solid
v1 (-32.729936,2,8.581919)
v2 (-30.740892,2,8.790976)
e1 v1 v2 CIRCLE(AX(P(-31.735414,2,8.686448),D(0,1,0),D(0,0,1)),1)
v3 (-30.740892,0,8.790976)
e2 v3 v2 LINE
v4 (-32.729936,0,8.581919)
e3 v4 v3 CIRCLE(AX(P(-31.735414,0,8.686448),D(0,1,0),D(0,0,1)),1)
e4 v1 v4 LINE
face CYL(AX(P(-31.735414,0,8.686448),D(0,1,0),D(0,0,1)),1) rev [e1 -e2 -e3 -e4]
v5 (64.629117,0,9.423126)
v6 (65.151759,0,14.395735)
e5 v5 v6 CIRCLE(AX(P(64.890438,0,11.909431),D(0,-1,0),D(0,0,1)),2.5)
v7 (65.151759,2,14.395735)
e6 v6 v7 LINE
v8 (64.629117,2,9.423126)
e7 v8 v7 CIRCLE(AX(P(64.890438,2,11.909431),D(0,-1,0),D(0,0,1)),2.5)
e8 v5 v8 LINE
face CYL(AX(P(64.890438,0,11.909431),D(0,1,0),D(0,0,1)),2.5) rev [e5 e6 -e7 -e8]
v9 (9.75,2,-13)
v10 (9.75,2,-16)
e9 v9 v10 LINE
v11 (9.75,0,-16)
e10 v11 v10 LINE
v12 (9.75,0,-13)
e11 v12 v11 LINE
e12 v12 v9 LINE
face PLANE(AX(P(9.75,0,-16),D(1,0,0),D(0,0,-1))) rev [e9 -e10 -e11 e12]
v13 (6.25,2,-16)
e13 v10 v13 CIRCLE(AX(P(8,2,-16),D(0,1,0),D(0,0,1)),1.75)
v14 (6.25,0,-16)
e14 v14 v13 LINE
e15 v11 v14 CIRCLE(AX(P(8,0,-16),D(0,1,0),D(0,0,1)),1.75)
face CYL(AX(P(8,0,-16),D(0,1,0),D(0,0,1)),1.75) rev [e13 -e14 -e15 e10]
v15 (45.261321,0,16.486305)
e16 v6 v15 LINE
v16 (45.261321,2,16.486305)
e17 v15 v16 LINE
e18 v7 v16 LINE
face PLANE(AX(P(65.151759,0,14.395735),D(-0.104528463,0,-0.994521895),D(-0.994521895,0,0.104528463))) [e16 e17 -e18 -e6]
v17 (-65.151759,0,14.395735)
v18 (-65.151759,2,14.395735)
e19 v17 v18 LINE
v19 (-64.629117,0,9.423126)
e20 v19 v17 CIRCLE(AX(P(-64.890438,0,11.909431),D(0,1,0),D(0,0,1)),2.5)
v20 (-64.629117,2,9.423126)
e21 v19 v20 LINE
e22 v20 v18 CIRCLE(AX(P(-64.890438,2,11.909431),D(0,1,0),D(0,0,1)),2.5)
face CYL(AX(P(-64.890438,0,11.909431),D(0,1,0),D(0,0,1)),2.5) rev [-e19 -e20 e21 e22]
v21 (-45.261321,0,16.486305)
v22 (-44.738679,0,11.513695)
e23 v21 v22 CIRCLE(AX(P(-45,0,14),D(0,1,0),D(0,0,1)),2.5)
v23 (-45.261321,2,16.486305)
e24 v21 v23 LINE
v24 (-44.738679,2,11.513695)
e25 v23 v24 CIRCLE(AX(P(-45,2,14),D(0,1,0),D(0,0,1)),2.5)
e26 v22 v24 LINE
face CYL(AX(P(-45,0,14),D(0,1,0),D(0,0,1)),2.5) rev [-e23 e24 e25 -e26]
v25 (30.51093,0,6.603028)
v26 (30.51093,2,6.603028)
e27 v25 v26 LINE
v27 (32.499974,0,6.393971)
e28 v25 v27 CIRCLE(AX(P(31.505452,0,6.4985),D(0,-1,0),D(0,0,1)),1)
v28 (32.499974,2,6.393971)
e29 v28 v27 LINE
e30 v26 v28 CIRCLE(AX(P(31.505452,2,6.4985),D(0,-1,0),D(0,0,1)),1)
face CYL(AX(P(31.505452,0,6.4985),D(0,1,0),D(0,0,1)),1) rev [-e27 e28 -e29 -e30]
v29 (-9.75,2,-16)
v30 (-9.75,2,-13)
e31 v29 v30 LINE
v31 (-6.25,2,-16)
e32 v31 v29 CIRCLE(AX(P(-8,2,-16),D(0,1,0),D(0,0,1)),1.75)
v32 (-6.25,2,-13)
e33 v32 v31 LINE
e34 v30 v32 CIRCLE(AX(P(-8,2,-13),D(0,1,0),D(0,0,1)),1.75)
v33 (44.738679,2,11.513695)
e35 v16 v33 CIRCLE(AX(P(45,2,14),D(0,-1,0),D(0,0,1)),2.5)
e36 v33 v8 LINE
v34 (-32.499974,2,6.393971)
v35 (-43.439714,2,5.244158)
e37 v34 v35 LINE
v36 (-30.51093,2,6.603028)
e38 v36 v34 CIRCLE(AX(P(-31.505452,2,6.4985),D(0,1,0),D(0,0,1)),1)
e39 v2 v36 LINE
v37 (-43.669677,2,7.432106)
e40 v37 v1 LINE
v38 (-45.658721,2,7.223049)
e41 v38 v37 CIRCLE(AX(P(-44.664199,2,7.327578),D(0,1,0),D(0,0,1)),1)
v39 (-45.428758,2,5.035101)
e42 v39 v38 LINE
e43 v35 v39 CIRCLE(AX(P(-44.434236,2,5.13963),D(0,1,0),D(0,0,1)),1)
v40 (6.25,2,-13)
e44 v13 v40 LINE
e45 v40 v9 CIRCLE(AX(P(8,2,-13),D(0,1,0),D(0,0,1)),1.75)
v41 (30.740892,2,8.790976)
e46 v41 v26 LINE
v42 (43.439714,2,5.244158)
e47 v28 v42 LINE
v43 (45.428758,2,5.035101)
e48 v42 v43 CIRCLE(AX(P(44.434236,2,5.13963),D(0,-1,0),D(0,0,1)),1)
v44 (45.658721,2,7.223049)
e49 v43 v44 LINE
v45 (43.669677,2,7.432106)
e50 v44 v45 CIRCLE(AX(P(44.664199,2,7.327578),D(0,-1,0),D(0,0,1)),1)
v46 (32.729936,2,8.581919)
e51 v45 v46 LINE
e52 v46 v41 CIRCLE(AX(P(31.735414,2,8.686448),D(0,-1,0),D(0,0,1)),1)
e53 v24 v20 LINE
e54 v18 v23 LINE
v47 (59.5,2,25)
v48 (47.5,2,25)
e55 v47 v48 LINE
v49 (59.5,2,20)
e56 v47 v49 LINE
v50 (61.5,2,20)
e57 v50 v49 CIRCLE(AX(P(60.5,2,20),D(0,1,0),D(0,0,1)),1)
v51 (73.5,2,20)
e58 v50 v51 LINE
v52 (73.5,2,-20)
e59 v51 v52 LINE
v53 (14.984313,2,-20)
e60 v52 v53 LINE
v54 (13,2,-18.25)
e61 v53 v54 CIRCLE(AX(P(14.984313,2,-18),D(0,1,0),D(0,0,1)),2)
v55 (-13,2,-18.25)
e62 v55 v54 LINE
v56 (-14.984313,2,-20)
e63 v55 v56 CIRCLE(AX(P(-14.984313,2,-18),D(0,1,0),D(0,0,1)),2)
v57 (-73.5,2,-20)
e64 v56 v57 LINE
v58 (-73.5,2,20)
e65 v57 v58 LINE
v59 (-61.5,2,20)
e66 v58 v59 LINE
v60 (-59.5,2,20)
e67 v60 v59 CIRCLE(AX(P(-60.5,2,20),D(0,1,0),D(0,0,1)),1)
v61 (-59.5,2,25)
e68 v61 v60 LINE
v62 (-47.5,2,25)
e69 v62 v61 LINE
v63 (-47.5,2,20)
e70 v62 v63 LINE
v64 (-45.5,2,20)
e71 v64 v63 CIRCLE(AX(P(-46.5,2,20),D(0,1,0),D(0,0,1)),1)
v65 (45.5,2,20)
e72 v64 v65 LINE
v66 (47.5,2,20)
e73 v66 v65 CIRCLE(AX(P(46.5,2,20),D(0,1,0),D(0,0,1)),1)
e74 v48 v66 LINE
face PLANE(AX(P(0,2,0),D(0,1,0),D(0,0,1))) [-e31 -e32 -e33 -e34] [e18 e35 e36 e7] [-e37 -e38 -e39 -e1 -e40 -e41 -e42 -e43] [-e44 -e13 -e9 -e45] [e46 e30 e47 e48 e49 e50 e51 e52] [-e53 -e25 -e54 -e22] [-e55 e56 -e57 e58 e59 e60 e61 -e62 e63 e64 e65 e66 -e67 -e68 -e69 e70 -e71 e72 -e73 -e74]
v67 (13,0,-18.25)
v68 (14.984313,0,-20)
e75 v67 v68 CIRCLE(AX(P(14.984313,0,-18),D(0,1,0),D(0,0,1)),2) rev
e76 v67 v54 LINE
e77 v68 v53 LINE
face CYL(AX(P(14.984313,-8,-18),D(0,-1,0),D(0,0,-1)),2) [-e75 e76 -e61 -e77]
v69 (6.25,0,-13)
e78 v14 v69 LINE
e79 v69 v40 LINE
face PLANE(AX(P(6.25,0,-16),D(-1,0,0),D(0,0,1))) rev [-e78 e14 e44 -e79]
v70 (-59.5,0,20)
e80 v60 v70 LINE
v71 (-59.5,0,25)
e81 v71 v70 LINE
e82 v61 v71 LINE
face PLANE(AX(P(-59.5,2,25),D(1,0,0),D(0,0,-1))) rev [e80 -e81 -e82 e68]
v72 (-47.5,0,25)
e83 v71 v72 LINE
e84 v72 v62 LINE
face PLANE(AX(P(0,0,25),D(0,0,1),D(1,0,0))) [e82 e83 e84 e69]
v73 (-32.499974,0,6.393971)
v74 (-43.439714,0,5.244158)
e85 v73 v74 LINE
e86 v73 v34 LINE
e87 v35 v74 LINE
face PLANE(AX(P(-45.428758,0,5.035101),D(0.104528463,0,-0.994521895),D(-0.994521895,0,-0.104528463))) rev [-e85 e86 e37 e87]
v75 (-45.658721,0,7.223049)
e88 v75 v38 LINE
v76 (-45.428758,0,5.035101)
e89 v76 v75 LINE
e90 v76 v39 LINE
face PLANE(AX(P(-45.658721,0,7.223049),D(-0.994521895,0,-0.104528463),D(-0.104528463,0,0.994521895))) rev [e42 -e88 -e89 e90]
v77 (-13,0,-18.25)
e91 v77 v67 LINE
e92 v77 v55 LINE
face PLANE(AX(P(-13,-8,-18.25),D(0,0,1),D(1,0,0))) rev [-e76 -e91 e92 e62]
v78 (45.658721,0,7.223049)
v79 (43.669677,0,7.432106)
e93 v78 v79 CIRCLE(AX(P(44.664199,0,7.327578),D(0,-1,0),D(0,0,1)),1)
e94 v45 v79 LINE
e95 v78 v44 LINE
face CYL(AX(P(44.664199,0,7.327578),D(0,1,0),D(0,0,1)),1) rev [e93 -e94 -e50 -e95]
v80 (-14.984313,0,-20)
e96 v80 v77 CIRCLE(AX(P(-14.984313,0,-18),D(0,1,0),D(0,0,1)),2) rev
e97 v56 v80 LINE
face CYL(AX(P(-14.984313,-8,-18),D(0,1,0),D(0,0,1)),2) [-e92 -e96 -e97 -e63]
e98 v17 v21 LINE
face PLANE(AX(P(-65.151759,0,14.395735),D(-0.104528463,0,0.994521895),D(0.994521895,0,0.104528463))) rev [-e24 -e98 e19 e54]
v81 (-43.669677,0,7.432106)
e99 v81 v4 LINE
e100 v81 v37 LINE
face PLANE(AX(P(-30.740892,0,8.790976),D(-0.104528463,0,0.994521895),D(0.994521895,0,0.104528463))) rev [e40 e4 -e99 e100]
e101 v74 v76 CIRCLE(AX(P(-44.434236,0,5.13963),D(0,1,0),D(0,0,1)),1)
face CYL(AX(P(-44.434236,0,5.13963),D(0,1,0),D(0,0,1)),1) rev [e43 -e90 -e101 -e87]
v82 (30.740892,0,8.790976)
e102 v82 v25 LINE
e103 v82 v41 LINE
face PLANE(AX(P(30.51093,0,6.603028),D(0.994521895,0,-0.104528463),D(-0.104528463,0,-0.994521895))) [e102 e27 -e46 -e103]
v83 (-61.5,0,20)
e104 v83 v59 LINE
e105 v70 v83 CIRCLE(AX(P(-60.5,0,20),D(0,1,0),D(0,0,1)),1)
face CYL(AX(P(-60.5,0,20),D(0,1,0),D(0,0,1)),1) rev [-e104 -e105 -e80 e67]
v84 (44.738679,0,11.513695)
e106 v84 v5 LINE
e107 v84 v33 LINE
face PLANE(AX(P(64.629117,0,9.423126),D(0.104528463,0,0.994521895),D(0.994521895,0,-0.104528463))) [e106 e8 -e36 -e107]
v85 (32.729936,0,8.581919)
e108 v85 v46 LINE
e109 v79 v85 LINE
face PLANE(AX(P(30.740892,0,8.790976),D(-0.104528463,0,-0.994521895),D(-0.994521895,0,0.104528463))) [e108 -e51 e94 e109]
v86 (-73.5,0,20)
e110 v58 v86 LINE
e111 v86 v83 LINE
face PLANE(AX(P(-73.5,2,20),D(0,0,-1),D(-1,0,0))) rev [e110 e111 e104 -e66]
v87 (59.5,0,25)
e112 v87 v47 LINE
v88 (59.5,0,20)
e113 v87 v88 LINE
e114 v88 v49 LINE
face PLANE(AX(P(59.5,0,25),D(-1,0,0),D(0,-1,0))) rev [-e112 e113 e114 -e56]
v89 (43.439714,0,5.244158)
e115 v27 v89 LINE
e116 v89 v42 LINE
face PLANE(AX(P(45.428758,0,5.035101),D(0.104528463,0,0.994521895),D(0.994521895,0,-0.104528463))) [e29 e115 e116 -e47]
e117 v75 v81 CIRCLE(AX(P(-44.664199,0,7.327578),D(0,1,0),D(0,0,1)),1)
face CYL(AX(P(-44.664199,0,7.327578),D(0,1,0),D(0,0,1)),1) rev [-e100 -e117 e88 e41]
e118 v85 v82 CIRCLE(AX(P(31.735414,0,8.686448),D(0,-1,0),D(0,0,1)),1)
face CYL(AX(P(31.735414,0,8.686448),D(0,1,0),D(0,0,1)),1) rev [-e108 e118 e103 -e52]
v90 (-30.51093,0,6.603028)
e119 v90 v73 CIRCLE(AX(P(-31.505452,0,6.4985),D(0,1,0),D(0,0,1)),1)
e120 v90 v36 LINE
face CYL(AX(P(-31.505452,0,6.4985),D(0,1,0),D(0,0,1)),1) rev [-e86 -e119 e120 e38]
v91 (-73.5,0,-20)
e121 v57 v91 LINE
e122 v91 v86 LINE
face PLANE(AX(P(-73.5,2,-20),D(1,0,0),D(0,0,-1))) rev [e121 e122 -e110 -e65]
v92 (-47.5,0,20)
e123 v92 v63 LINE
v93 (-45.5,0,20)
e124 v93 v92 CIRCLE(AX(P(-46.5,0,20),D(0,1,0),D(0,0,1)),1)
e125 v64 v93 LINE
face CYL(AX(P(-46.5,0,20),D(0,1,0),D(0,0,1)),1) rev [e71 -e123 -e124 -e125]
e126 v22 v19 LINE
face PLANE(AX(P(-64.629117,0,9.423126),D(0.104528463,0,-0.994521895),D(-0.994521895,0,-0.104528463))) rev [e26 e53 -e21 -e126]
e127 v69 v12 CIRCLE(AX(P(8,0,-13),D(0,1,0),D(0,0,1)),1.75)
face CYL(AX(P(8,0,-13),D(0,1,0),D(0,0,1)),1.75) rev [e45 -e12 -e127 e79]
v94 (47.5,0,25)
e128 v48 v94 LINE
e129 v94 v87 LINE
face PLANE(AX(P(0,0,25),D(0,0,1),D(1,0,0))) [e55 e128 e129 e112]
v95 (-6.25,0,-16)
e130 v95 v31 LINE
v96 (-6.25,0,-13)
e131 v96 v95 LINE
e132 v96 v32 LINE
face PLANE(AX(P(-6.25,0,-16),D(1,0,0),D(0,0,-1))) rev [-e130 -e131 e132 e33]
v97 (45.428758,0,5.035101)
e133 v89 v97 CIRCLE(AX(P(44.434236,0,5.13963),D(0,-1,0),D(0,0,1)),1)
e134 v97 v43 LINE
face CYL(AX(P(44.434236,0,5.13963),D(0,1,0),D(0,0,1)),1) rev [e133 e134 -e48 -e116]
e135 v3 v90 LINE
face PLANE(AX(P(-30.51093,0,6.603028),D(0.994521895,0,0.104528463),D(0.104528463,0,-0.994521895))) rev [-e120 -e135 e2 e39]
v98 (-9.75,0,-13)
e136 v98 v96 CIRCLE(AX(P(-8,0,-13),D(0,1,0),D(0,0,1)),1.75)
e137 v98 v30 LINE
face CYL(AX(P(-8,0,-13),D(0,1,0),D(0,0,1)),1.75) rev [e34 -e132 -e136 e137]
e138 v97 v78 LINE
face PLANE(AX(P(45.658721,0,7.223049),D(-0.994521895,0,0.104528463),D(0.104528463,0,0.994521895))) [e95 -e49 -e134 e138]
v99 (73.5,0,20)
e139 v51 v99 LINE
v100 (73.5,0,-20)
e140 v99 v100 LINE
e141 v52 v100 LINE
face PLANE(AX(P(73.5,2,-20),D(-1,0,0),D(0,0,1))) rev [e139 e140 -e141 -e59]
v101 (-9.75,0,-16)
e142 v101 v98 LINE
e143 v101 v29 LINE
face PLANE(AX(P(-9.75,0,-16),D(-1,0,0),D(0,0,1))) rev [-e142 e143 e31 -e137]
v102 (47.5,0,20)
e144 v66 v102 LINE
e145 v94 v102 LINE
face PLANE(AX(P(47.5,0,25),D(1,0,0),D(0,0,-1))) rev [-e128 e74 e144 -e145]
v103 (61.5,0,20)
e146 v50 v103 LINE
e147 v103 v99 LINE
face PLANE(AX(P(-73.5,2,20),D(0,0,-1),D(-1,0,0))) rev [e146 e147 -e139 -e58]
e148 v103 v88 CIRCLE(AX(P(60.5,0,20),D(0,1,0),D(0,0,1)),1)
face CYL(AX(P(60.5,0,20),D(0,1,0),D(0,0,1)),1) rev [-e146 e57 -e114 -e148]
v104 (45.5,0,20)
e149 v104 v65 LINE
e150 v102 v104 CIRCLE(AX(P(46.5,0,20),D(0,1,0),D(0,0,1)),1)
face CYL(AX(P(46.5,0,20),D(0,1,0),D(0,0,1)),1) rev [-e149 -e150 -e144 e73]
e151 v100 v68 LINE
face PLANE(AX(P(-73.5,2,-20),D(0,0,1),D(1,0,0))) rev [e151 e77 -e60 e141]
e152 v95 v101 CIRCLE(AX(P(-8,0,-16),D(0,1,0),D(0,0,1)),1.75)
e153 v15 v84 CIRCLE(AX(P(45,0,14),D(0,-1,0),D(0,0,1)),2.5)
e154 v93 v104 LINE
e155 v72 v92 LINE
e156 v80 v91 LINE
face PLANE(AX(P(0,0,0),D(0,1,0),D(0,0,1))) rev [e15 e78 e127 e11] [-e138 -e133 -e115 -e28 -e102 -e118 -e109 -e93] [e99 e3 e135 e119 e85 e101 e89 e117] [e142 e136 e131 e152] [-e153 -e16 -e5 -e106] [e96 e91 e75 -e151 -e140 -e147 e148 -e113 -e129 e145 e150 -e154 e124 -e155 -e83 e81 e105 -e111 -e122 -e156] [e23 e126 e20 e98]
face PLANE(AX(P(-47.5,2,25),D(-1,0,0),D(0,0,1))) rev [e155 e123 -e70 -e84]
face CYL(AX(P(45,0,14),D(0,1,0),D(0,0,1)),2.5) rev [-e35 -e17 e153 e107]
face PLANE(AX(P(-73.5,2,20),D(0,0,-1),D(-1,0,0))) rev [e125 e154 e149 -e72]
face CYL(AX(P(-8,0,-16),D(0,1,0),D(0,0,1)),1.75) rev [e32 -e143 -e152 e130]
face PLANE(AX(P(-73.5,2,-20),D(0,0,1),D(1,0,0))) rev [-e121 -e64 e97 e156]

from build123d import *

# Parameters (mm, degrees)
SKETCH_1_W          = 147
SKETCH_1_H          = 40
EXTRUDE_1_DEPTH     = 2
CUT_EXTRUDE_1_DEPTH = 77.198753271
SKETCH_3_R          = 1
CUT_EXTRUDE_2_DEPTH = 77.198753271
SKETCH_5_W          = 12
SKETCH_5_H          = 2
EXTRUDE_2_DEPTH     = 5
SKETCH_7_R          = 1
CUT_EXTRUDE_3_DEPTH = 78.661122835
CUT_EXTRUDE_5_DEPTH = 78.661122835
SKETCH_11_W         = 26
SKETCH_11_H         = 3.5
CUT_EXTRUDE_6_DEPTH = 10
FILLET_1_R          = 2
CUT_EXTRUDE_7_DEPTH = 78.661122835


with BuildPart() as part:
    # 草图1 → 凸台-拉伸1 (new body)
    with BuildSketch(Plane(origin=(0, 0, 0), x_dir=(1, 0, 0), z_dir=(0, 1, 0))):
        Rectangle(SKETCH_1_W, SKETCH_1_H)
    extrude(amount=EXTRUDE_1_DEPTH)

    # 草图2 → 切除-拉伸1 (cut, through all)
    with BuildSketch(Plane(origin=(0, 2, 0), x_dir=(1, 0, 0), z_dir=(0, 1, 0))):
        Polygon((-45.658720859, -7.223049229), (-45.42875824, -5.035101059), (-30.51092981, -6.603028008), (-30.740892429, -8.790976178), align=None)
    cut_extrude_1 = extrude(amount=-CUT_EXTRUDE_1_DEPTH, mode=Mode.SUBTRACT)

    # 草图3 → 切除-拉伸2 (cut, through all)
    with BuildSketch(Plane(origin=(0, 2, 0), x_dir=(1, 0, 0), z_dir=(0, 1, 0))):
        with Locations((-44.434236345, -5.139629522)):
            Circle(SKETCH_3_R)
        with Locations((-44.664198964, -7.327577692)):
            Circle(SKETCH_3_R)
        with Locations((-31.505451705, -6.498499545)):
            Circle(SKETCH_3_R)
        with Locations((-31.735414324, -8.686447714)):
            Circle(SKETCH_3_R)
    cut_extrude_2 = extrude(amount=-CUT_EXTRUDE_2_DEPTH, mode=Mode.SUBTRACT)

    # 镜向1: 切除-拉伸1, 切除-拉伸2 across plane
    add(cut_extrude_1.mirror(Plane(origin=(0, 0, 0), x_dir=(0, 0, 1), z_dir=(1, 0, 0))), mode=Mode.SUBTRACT)
    add(cut_extrude_2.mirror(Plane(origin=(0, 0, 0), x_dir=(0, 0, 1), z_dir=(1, 0, 0))), mode=Mode.SUBTRACT)

    # 草图5 → 凸台-拉伸2 (add)
    with BuildSketch(Plane.XY.offset(20)):
        with Locations((53.5, 1)):
            Rectangle(SKETCH_5_W, SKETCH_5_H)
        with Locations((-53.5, 1)):
            Rectangle(SKETCH_5_W, SKETCH_5_H)
    extrude(amount=EXTRUDE_2_DEPTH)

    # 草图7 → 切除-拉伸3 (cut, through all)
    with BuildSketch(Plane(origin=(0, 2, 0), x_dir=(1, 0, 0), z_dir=(0, 1, 0))):
        with Locations((60.5, -20)):
            Circle(SKETCH_7_R)
        with Locations((46.5, -20)):
            Circle(SKETCH_7_R)
        with Locations((-46.5, -20)):
            Circle(SKETCH_7_R)
        with Locations((-60.5, -20)):
            Circle(SKETCH_7_R)
    extrude(amount=-CUT_EXTRUDE_3_DEPTH, mode=Mode.SUBTRACT)

    # 草图10 → 切除-拉伸5 (cut, through all)
    with BuildSketch(Plane(origin=(0, 2, 0), x_dir=(1, 0, 0), z_dir=(0, 1, 0))):
        with BuildLine():
            Line((-64.629116749, -9.423125996), (-44.738678842, -11.513695262))
            ThreePointArc((-44.738678842, -11.513695262), (-42.513695262, -14.261321158), (-45.261321158, -16.486304738))
            Line((-45.261321158, -16.486304738), (-65.151759066, -14.395735473))
            ThreePointArc((-65.151759066, -14.395735473), (-67.376742646, -11.648109576), (-64.629116749, -9.423125996))
        make_face()
    cut_extrude_5 = extrude(amount=-CUT_EXTRUDE_5_DEPTH, mode=Mode.SUBTRACT)

    # 镜向2: 切除-拉伸5 across plane
    add(cut_extrude_5.mirror(Plane(origin=(0, 0, 0), x_dir=(0, 0, 1), z_dir=(1, 0, 0))), mode=Mode.SUBTRACT)

    # 草图11 → 切除-拉伸6 (cut)
    with BuildSketch(Plane(origin=(0, 2, 0), x_dir=(1, 0, 0), z_dir=(0, 1, 0))):
        with Locations((0, 20)):
            Rectangle(SKETCH_11_W, SKETCH_11_H)
    extrude(amount=-CUT_EXTRUDE_6_DEPTH, mode=Mode.SUBTRACT)

    # 圆角1
    # the kernel refuses this fillet: 2 mm, written as the material it takes off along each edge
    with BuildSketch(Plane(origin=(13, -4.960783708, -20), x_dir=(1, 0, 0), z_dir=(0, 1, 0)), Plane(origin=(-13, 6.960783708, -20), x_dir=(-1, 0, 0), z_dir=(0, -1, 0))) as fillet_1_piece_1:
        with BuildLine():
            CenterArc((1.984313483, -2), FILLET_1_R, 90, 82.819244219)
            Line((0, -1.75), (-0.03968627, -1.745))
            ThreePointArc((-0.03968627, -1.745), (-0.04, -0.875), (-0.04, 0))
            Line((-0.04, 0), (0, 0.04))
            Line((0, 0.04), (1.984313483, 0.04))
            Line((1.984313483, 0.04), (1.984313483, 0))
        make_face()
    extrude(amount=11.921567416, mode=Mode.SUBTRACT)

    # 草图12 → 切除-拉伸7 (cut, through all)
    with BuildSketch(Plane(origin=(0, 2, 0), x_dir=(1, 0, 0), z_dir=(0, 1, 0))):
        with BuildLine():
            Line((-6.25, 16), (-6.25, 13))
            ThreePointArc((-6.25, 13), (-8, 11.25), (-9.75, 13))
            Line((-9.75, 13), (-9.75, 16))
            ThreePointArc((-9.75, 16), (-8, 17.75), (-6.25, 16))
        make_face()
        with BuildLine():
            Line((9.75, 16), (9.75, 13))
            ThreePointArc((9.75, 13), (8, 11.25), (6.25, 13))
            Line((6.25, 13), (6.25, 16))
            ThreePointArc((6.25, 16), (8, 17.75), (9.75, 16))
        make_face()
    extrude(amount=-CUT_EXTRUDE_7_DEPTH, mode=Mode.SUBTRACT)


solid = part.part
